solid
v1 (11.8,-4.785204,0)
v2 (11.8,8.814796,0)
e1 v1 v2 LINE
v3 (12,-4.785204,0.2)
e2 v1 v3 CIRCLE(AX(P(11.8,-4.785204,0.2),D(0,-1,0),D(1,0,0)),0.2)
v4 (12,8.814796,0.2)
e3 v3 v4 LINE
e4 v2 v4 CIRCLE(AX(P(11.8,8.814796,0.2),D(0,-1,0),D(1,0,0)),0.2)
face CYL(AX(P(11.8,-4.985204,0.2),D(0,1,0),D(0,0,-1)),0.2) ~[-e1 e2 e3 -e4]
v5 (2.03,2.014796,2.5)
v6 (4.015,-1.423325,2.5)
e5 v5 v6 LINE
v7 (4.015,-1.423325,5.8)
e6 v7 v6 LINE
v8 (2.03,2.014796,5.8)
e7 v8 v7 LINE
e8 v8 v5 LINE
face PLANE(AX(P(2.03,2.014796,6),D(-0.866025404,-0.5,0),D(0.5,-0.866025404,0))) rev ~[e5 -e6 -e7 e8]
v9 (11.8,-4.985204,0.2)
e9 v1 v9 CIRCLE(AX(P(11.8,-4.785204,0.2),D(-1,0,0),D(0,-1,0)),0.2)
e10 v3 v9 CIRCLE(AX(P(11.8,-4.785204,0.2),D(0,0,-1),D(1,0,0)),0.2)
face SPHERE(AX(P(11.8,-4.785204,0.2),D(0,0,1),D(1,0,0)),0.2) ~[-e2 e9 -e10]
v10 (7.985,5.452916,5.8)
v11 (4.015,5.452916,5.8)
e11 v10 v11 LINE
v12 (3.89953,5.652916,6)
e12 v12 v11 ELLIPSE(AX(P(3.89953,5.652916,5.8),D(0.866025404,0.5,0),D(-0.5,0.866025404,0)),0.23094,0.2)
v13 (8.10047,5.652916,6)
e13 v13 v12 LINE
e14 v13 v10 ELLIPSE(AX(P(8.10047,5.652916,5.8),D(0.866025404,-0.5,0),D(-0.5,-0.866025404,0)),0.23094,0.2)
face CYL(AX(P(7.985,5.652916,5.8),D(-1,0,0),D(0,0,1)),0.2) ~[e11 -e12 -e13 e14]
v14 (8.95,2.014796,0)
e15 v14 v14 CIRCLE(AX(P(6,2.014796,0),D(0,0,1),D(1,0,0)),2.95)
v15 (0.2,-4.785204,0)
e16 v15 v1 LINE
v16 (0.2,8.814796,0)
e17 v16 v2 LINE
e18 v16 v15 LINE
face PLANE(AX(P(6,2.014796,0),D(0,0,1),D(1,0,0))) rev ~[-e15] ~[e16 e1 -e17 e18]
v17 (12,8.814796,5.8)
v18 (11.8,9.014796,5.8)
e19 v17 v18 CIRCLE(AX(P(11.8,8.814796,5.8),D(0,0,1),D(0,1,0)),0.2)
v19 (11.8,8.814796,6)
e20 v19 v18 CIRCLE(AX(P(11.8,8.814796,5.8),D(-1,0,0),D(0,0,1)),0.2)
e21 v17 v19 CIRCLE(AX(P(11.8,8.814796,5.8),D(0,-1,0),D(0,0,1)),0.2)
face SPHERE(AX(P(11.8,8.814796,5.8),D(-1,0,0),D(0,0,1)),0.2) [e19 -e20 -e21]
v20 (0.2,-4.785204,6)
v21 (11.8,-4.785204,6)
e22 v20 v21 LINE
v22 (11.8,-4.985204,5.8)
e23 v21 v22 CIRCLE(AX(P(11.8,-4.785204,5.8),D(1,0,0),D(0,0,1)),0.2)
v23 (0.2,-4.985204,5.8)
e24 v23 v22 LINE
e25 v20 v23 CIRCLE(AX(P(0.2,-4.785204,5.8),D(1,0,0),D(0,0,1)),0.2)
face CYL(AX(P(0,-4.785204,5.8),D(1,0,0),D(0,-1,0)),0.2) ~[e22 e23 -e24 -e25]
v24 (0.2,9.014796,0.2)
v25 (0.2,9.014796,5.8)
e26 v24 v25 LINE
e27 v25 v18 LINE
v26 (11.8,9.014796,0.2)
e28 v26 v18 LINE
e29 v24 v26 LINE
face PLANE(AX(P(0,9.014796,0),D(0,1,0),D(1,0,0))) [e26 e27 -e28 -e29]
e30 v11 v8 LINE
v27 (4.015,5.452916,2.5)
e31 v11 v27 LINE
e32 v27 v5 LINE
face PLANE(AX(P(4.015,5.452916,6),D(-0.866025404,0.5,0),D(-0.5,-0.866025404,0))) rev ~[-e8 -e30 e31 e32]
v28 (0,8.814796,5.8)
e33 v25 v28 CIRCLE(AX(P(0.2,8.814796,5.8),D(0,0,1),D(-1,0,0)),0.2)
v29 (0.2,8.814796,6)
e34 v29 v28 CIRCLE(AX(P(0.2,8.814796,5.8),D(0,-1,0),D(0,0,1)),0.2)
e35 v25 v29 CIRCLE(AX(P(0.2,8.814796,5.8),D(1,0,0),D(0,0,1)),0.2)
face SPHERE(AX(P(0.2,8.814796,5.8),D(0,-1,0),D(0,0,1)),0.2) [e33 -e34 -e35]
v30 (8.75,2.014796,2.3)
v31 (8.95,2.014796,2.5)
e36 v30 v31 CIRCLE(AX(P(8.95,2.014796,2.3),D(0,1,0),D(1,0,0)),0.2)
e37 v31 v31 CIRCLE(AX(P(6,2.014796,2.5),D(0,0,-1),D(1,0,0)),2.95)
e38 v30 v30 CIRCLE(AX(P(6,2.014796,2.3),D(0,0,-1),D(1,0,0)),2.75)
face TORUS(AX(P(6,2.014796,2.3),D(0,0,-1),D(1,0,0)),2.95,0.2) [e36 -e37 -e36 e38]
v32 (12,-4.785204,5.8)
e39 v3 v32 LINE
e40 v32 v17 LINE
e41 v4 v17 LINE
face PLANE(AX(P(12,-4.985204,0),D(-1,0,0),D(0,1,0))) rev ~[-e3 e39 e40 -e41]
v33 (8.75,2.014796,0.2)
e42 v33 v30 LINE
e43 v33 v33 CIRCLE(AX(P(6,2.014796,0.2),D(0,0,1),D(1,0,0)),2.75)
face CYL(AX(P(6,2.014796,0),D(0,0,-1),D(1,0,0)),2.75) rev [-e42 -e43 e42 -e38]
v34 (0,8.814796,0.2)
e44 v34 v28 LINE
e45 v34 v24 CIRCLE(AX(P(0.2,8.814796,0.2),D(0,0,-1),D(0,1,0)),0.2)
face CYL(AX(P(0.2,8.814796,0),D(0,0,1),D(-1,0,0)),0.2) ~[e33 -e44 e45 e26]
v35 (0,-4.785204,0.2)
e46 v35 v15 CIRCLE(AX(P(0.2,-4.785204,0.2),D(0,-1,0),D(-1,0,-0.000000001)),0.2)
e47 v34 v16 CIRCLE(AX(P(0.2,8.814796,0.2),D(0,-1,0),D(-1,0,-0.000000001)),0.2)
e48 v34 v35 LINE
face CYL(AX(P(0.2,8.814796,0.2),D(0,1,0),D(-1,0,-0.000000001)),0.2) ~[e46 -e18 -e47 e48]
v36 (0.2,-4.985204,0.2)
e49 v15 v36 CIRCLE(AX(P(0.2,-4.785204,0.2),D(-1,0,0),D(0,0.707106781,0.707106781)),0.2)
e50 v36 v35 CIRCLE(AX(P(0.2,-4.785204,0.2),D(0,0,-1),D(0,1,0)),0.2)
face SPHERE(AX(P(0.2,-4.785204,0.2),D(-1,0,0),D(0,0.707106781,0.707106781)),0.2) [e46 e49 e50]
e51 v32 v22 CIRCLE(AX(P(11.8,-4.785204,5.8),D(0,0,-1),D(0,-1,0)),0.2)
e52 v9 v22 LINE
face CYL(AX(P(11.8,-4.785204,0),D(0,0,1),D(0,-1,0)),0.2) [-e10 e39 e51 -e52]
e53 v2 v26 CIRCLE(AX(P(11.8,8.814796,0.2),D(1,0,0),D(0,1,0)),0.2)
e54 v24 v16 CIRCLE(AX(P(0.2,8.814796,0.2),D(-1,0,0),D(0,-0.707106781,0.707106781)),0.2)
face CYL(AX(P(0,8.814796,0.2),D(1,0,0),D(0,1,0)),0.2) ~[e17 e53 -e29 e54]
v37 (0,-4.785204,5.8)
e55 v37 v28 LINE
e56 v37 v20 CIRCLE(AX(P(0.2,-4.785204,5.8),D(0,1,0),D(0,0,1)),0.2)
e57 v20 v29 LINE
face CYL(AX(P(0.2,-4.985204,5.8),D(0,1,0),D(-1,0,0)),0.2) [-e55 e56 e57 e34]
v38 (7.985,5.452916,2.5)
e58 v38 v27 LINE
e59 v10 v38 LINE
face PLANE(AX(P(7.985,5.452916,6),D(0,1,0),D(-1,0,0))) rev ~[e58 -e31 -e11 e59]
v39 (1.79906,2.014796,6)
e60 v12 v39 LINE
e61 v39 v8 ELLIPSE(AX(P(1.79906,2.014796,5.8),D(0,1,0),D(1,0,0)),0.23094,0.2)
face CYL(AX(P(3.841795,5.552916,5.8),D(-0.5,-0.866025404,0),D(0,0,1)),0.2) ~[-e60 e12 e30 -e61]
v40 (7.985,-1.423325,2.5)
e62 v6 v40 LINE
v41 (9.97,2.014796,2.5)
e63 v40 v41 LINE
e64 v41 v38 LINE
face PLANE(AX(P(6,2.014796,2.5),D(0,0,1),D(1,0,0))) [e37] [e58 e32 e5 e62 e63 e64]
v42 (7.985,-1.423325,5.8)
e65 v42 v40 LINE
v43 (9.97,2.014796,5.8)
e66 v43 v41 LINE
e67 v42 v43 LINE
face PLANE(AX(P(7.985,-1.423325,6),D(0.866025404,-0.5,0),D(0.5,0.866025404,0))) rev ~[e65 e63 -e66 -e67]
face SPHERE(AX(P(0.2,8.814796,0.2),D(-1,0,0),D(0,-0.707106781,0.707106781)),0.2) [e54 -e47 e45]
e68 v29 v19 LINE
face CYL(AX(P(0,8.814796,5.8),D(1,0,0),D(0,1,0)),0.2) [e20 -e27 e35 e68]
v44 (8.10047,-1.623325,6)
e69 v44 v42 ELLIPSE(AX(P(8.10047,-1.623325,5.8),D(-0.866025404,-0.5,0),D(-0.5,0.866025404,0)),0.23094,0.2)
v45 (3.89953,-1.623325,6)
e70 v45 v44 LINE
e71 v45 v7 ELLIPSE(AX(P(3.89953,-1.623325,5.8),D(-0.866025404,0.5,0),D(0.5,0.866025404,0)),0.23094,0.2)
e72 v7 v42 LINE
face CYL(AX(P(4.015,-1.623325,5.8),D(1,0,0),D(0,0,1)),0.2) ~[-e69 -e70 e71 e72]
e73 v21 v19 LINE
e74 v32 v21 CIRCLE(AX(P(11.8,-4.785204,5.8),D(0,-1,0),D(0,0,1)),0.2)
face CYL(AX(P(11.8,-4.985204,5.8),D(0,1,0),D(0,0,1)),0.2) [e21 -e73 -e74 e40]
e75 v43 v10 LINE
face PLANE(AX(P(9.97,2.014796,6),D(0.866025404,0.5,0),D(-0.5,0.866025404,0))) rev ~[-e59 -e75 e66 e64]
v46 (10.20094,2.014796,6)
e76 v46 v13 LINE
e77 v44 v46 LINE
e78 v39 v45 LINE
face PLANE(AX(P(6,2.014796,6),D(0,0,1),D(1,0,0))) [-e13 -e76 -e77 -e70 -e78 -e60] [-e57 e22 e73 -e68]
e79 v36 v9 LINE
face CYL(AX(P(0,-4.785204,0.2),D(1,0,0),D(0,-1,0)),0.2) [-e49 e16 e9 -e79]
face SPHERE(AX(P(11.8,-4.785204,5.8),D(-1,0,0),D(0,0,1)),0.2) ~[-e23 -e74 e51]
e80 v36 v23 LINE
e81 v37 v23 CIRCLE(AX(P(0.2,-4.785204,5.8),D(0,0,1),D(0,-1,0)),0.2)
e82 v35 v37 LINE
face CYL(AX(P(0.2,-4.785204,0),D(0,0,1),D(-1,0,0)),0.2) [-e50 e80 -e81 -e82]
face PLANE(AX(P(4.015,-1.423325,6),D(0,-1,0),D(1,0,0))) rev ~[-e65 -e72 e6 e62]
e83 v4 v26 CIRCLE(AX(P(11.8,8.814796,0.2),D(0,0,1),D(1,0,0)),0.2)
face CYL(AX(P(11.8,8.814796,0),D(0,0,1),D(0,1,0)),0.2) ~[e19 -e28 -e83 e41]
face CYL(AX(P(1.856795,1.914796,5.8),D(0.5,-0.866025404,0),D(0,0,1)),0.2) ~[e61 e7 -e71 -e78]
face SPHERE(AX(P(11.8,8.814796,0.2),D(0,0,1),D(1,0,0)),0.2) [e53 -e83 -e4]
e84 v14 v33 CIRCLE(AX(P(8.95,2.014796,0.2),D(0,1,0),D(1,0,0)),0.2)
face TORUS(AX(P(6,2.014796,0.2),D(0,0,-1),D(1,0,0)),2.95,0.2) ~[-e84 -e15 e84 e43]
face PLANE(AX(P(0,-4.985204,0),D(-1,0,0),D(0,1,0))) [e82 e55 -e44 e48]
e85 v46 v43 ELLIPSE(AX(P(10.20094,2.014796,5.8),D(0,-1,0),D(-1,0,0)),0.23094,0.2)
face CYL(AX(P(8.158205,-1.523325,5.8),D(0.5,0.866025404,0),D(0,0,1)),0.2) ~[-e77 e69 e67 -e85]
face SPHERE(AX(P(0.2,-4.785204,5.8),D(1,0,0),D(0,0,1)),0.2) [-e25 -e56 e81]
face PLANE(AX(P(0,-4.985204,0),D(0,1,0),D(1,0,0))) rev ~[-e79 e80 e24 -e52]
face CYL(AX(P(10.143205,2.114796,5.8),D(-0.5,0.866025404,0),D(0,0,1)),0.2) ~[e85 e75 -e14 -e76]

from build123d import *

# Parameters (mm, degrees)
F4_W         = 12
F4_H         = 14
F4_R         = 2.75
F0_DEPTH     = 6
F5_DEPTH     = 3.5
F2_R         = 0.2
F3_T1_DEPTH  = 13.6
F3_S5_W      = 0.2
F3_S5_H      = 0.2
F3_T6_DEPTH  = 0.2
F3_S11_W     = 0.2
F3_S11_H     = 0.2
F3_T12_DEPTH = 0.2


# Not quite as in the source:
# - a fillet or chamfer that OpenCascade refuses, or shapes differently, is made with other operations: its cross-section is extruded or revolved along the edge and cut away or added


with BuildPart() as f0:
    # F4 (on Top) → F0 (new body)
    with BuildSketch(Plane.XY):
        with Locations((6, 2.0147956188)):
            Rectangle(F4_W, F4_H)
        with Locations((6, 2.0147956188)):
            Circle(F4_R, mode=Mode.SUBTRACT)
    extrude(amount=F0_DEPTH)

    # F1 (on face) → F5 (cut)
    with BuildSketch(Plane.XY.offset(6)):
        Polygon((4.015, -1.4233252342), (7.985, -1.4233252342), (9.97, 2.0147956188), (7.985, 5.4529164718), (4.015, 5.4529164718), (2.03, 2.0147956188), align=None)
    extrude(amount=-F5_DEPTH, mode=Mode.SUBTRACT)

    # F2
    f2_edges = [f0.edges().sort_by_distance(p)[0] for p in [
        (6, -4.985204, 6),
        (0, 2.014796, 6),
        (6, 9.014796, 6),
        (12, 2.014796, 6),
        (6, 5.452916, 6),
        (8.9775, 3.733856, 6),
        (8.9775, 0.295735, 6),
        (6, -1.423325, 6),
        (3.0225, 0.295735, 6),
        (3.0225, 3.733856, 6),
        (3.25, 2.014796, 2.5),
        (12, -4.985204, 3),
        (12, 9.014796, 3),
        (12, 2.014796, 0),
        (6, -4.985204, 0),
        (0, -4.985204, 3),
        (3.25, 2.014796, 0),
        (6, 9.014796, 0),
        (0, 9.014796, 3),
    ]]
    fillet(f2_edges, radius=F2_R)

    # F3: fillet of radius 0.2 on 1 edges, made by hand

    # F3_s2 → F3_t1 (cut)
    with BuildSketch(Plane.XZ.offset(-8.8147956188)):
        with BuildLine():
            ThreePointArc((0, 0.2), (0.0585786438, 0.0585786438), (0.2, 0))
            Line((0.2, 0), (0, 0))
            Line((0, 0), (0, 0.2))
        make_face()
    extrude(amount=F3_T1_DEPTH, mode=Mode.SUBTRACT)


with BuildPart() as f3_tool4:
    # F3_s5 → F3_t6 (new body)
    with BuildSketch(Plane.YZ.offset(0.2)):
        with Locations((8.9147956188, 0.1)):
            Rectangle(F3_S5_W, F3_S5_H)
    extrude(amount=-F3_T6_DEPTH)

    # F3_s7 → F3_t8 (revolve, cut)
    with BuildSketch(Plane(origin=(0.2, 8.8147956188, 0.2), x_dir=(0, -0.7071067812, 0.7071067812), z_dir=(0, -0.7071067812, -0.7071067812))):
        with BuildLine():
            ThreePointArc((0, -0.2), (0.2, 0), (0, 0.2))
            Line((0, 0.2), (0, -0.2))
        make_face()
    revolve(axis=Axis((0.2, 8.8147956188, 0.2), (-1, 0, 0)), mode=Mode.SUBTRACT)


with BuildPart() as f0_1:
    add(f0.part)

    # F3_t3: cut F3_tool4
    add(f3_tool4.part, mode=Mode.SUBTRACT)


with BuildPart() as f3_tool10:
    # F3_s11 → F3_t12 (new body)
    with BuildSketch(Plane.YZ.offset(0.2)):
        with Locations((-4.8852043812, 0.1)):
            Rectangle(F3_S11_W, F3_S11_H)
    extrude(amount=-F3_T12_DEPTH)

    # F3_s13 → F3_t14 (revolve, cut)
    with BuildSketch(Plane(origin=(0.2, -4.7852043812, 0.2), x_dir=(0, 0.7071067812, 0.7071067812), z_dir=(0, -0.7071067812, 0.7071067812))):
        with BuildLine():
            ThreePointArc((0, -0.2), (0.2, 0), (0, 0.2))
            Line((0, 0.2), (0, -0.2))
        make_face()
    revolve(axis=Axis((0.2, -4.7852043812, 0.2), (-1, 0, 0)), mode=Mode.SUBTRACT)


with BuildPart() as f0_2:
    add(f0_1.part)

    # F3_t9: cut F3_tool10
    add(f3_tool10.part, mode=Mode.SUBTRACT)


solid = f0_2.part
